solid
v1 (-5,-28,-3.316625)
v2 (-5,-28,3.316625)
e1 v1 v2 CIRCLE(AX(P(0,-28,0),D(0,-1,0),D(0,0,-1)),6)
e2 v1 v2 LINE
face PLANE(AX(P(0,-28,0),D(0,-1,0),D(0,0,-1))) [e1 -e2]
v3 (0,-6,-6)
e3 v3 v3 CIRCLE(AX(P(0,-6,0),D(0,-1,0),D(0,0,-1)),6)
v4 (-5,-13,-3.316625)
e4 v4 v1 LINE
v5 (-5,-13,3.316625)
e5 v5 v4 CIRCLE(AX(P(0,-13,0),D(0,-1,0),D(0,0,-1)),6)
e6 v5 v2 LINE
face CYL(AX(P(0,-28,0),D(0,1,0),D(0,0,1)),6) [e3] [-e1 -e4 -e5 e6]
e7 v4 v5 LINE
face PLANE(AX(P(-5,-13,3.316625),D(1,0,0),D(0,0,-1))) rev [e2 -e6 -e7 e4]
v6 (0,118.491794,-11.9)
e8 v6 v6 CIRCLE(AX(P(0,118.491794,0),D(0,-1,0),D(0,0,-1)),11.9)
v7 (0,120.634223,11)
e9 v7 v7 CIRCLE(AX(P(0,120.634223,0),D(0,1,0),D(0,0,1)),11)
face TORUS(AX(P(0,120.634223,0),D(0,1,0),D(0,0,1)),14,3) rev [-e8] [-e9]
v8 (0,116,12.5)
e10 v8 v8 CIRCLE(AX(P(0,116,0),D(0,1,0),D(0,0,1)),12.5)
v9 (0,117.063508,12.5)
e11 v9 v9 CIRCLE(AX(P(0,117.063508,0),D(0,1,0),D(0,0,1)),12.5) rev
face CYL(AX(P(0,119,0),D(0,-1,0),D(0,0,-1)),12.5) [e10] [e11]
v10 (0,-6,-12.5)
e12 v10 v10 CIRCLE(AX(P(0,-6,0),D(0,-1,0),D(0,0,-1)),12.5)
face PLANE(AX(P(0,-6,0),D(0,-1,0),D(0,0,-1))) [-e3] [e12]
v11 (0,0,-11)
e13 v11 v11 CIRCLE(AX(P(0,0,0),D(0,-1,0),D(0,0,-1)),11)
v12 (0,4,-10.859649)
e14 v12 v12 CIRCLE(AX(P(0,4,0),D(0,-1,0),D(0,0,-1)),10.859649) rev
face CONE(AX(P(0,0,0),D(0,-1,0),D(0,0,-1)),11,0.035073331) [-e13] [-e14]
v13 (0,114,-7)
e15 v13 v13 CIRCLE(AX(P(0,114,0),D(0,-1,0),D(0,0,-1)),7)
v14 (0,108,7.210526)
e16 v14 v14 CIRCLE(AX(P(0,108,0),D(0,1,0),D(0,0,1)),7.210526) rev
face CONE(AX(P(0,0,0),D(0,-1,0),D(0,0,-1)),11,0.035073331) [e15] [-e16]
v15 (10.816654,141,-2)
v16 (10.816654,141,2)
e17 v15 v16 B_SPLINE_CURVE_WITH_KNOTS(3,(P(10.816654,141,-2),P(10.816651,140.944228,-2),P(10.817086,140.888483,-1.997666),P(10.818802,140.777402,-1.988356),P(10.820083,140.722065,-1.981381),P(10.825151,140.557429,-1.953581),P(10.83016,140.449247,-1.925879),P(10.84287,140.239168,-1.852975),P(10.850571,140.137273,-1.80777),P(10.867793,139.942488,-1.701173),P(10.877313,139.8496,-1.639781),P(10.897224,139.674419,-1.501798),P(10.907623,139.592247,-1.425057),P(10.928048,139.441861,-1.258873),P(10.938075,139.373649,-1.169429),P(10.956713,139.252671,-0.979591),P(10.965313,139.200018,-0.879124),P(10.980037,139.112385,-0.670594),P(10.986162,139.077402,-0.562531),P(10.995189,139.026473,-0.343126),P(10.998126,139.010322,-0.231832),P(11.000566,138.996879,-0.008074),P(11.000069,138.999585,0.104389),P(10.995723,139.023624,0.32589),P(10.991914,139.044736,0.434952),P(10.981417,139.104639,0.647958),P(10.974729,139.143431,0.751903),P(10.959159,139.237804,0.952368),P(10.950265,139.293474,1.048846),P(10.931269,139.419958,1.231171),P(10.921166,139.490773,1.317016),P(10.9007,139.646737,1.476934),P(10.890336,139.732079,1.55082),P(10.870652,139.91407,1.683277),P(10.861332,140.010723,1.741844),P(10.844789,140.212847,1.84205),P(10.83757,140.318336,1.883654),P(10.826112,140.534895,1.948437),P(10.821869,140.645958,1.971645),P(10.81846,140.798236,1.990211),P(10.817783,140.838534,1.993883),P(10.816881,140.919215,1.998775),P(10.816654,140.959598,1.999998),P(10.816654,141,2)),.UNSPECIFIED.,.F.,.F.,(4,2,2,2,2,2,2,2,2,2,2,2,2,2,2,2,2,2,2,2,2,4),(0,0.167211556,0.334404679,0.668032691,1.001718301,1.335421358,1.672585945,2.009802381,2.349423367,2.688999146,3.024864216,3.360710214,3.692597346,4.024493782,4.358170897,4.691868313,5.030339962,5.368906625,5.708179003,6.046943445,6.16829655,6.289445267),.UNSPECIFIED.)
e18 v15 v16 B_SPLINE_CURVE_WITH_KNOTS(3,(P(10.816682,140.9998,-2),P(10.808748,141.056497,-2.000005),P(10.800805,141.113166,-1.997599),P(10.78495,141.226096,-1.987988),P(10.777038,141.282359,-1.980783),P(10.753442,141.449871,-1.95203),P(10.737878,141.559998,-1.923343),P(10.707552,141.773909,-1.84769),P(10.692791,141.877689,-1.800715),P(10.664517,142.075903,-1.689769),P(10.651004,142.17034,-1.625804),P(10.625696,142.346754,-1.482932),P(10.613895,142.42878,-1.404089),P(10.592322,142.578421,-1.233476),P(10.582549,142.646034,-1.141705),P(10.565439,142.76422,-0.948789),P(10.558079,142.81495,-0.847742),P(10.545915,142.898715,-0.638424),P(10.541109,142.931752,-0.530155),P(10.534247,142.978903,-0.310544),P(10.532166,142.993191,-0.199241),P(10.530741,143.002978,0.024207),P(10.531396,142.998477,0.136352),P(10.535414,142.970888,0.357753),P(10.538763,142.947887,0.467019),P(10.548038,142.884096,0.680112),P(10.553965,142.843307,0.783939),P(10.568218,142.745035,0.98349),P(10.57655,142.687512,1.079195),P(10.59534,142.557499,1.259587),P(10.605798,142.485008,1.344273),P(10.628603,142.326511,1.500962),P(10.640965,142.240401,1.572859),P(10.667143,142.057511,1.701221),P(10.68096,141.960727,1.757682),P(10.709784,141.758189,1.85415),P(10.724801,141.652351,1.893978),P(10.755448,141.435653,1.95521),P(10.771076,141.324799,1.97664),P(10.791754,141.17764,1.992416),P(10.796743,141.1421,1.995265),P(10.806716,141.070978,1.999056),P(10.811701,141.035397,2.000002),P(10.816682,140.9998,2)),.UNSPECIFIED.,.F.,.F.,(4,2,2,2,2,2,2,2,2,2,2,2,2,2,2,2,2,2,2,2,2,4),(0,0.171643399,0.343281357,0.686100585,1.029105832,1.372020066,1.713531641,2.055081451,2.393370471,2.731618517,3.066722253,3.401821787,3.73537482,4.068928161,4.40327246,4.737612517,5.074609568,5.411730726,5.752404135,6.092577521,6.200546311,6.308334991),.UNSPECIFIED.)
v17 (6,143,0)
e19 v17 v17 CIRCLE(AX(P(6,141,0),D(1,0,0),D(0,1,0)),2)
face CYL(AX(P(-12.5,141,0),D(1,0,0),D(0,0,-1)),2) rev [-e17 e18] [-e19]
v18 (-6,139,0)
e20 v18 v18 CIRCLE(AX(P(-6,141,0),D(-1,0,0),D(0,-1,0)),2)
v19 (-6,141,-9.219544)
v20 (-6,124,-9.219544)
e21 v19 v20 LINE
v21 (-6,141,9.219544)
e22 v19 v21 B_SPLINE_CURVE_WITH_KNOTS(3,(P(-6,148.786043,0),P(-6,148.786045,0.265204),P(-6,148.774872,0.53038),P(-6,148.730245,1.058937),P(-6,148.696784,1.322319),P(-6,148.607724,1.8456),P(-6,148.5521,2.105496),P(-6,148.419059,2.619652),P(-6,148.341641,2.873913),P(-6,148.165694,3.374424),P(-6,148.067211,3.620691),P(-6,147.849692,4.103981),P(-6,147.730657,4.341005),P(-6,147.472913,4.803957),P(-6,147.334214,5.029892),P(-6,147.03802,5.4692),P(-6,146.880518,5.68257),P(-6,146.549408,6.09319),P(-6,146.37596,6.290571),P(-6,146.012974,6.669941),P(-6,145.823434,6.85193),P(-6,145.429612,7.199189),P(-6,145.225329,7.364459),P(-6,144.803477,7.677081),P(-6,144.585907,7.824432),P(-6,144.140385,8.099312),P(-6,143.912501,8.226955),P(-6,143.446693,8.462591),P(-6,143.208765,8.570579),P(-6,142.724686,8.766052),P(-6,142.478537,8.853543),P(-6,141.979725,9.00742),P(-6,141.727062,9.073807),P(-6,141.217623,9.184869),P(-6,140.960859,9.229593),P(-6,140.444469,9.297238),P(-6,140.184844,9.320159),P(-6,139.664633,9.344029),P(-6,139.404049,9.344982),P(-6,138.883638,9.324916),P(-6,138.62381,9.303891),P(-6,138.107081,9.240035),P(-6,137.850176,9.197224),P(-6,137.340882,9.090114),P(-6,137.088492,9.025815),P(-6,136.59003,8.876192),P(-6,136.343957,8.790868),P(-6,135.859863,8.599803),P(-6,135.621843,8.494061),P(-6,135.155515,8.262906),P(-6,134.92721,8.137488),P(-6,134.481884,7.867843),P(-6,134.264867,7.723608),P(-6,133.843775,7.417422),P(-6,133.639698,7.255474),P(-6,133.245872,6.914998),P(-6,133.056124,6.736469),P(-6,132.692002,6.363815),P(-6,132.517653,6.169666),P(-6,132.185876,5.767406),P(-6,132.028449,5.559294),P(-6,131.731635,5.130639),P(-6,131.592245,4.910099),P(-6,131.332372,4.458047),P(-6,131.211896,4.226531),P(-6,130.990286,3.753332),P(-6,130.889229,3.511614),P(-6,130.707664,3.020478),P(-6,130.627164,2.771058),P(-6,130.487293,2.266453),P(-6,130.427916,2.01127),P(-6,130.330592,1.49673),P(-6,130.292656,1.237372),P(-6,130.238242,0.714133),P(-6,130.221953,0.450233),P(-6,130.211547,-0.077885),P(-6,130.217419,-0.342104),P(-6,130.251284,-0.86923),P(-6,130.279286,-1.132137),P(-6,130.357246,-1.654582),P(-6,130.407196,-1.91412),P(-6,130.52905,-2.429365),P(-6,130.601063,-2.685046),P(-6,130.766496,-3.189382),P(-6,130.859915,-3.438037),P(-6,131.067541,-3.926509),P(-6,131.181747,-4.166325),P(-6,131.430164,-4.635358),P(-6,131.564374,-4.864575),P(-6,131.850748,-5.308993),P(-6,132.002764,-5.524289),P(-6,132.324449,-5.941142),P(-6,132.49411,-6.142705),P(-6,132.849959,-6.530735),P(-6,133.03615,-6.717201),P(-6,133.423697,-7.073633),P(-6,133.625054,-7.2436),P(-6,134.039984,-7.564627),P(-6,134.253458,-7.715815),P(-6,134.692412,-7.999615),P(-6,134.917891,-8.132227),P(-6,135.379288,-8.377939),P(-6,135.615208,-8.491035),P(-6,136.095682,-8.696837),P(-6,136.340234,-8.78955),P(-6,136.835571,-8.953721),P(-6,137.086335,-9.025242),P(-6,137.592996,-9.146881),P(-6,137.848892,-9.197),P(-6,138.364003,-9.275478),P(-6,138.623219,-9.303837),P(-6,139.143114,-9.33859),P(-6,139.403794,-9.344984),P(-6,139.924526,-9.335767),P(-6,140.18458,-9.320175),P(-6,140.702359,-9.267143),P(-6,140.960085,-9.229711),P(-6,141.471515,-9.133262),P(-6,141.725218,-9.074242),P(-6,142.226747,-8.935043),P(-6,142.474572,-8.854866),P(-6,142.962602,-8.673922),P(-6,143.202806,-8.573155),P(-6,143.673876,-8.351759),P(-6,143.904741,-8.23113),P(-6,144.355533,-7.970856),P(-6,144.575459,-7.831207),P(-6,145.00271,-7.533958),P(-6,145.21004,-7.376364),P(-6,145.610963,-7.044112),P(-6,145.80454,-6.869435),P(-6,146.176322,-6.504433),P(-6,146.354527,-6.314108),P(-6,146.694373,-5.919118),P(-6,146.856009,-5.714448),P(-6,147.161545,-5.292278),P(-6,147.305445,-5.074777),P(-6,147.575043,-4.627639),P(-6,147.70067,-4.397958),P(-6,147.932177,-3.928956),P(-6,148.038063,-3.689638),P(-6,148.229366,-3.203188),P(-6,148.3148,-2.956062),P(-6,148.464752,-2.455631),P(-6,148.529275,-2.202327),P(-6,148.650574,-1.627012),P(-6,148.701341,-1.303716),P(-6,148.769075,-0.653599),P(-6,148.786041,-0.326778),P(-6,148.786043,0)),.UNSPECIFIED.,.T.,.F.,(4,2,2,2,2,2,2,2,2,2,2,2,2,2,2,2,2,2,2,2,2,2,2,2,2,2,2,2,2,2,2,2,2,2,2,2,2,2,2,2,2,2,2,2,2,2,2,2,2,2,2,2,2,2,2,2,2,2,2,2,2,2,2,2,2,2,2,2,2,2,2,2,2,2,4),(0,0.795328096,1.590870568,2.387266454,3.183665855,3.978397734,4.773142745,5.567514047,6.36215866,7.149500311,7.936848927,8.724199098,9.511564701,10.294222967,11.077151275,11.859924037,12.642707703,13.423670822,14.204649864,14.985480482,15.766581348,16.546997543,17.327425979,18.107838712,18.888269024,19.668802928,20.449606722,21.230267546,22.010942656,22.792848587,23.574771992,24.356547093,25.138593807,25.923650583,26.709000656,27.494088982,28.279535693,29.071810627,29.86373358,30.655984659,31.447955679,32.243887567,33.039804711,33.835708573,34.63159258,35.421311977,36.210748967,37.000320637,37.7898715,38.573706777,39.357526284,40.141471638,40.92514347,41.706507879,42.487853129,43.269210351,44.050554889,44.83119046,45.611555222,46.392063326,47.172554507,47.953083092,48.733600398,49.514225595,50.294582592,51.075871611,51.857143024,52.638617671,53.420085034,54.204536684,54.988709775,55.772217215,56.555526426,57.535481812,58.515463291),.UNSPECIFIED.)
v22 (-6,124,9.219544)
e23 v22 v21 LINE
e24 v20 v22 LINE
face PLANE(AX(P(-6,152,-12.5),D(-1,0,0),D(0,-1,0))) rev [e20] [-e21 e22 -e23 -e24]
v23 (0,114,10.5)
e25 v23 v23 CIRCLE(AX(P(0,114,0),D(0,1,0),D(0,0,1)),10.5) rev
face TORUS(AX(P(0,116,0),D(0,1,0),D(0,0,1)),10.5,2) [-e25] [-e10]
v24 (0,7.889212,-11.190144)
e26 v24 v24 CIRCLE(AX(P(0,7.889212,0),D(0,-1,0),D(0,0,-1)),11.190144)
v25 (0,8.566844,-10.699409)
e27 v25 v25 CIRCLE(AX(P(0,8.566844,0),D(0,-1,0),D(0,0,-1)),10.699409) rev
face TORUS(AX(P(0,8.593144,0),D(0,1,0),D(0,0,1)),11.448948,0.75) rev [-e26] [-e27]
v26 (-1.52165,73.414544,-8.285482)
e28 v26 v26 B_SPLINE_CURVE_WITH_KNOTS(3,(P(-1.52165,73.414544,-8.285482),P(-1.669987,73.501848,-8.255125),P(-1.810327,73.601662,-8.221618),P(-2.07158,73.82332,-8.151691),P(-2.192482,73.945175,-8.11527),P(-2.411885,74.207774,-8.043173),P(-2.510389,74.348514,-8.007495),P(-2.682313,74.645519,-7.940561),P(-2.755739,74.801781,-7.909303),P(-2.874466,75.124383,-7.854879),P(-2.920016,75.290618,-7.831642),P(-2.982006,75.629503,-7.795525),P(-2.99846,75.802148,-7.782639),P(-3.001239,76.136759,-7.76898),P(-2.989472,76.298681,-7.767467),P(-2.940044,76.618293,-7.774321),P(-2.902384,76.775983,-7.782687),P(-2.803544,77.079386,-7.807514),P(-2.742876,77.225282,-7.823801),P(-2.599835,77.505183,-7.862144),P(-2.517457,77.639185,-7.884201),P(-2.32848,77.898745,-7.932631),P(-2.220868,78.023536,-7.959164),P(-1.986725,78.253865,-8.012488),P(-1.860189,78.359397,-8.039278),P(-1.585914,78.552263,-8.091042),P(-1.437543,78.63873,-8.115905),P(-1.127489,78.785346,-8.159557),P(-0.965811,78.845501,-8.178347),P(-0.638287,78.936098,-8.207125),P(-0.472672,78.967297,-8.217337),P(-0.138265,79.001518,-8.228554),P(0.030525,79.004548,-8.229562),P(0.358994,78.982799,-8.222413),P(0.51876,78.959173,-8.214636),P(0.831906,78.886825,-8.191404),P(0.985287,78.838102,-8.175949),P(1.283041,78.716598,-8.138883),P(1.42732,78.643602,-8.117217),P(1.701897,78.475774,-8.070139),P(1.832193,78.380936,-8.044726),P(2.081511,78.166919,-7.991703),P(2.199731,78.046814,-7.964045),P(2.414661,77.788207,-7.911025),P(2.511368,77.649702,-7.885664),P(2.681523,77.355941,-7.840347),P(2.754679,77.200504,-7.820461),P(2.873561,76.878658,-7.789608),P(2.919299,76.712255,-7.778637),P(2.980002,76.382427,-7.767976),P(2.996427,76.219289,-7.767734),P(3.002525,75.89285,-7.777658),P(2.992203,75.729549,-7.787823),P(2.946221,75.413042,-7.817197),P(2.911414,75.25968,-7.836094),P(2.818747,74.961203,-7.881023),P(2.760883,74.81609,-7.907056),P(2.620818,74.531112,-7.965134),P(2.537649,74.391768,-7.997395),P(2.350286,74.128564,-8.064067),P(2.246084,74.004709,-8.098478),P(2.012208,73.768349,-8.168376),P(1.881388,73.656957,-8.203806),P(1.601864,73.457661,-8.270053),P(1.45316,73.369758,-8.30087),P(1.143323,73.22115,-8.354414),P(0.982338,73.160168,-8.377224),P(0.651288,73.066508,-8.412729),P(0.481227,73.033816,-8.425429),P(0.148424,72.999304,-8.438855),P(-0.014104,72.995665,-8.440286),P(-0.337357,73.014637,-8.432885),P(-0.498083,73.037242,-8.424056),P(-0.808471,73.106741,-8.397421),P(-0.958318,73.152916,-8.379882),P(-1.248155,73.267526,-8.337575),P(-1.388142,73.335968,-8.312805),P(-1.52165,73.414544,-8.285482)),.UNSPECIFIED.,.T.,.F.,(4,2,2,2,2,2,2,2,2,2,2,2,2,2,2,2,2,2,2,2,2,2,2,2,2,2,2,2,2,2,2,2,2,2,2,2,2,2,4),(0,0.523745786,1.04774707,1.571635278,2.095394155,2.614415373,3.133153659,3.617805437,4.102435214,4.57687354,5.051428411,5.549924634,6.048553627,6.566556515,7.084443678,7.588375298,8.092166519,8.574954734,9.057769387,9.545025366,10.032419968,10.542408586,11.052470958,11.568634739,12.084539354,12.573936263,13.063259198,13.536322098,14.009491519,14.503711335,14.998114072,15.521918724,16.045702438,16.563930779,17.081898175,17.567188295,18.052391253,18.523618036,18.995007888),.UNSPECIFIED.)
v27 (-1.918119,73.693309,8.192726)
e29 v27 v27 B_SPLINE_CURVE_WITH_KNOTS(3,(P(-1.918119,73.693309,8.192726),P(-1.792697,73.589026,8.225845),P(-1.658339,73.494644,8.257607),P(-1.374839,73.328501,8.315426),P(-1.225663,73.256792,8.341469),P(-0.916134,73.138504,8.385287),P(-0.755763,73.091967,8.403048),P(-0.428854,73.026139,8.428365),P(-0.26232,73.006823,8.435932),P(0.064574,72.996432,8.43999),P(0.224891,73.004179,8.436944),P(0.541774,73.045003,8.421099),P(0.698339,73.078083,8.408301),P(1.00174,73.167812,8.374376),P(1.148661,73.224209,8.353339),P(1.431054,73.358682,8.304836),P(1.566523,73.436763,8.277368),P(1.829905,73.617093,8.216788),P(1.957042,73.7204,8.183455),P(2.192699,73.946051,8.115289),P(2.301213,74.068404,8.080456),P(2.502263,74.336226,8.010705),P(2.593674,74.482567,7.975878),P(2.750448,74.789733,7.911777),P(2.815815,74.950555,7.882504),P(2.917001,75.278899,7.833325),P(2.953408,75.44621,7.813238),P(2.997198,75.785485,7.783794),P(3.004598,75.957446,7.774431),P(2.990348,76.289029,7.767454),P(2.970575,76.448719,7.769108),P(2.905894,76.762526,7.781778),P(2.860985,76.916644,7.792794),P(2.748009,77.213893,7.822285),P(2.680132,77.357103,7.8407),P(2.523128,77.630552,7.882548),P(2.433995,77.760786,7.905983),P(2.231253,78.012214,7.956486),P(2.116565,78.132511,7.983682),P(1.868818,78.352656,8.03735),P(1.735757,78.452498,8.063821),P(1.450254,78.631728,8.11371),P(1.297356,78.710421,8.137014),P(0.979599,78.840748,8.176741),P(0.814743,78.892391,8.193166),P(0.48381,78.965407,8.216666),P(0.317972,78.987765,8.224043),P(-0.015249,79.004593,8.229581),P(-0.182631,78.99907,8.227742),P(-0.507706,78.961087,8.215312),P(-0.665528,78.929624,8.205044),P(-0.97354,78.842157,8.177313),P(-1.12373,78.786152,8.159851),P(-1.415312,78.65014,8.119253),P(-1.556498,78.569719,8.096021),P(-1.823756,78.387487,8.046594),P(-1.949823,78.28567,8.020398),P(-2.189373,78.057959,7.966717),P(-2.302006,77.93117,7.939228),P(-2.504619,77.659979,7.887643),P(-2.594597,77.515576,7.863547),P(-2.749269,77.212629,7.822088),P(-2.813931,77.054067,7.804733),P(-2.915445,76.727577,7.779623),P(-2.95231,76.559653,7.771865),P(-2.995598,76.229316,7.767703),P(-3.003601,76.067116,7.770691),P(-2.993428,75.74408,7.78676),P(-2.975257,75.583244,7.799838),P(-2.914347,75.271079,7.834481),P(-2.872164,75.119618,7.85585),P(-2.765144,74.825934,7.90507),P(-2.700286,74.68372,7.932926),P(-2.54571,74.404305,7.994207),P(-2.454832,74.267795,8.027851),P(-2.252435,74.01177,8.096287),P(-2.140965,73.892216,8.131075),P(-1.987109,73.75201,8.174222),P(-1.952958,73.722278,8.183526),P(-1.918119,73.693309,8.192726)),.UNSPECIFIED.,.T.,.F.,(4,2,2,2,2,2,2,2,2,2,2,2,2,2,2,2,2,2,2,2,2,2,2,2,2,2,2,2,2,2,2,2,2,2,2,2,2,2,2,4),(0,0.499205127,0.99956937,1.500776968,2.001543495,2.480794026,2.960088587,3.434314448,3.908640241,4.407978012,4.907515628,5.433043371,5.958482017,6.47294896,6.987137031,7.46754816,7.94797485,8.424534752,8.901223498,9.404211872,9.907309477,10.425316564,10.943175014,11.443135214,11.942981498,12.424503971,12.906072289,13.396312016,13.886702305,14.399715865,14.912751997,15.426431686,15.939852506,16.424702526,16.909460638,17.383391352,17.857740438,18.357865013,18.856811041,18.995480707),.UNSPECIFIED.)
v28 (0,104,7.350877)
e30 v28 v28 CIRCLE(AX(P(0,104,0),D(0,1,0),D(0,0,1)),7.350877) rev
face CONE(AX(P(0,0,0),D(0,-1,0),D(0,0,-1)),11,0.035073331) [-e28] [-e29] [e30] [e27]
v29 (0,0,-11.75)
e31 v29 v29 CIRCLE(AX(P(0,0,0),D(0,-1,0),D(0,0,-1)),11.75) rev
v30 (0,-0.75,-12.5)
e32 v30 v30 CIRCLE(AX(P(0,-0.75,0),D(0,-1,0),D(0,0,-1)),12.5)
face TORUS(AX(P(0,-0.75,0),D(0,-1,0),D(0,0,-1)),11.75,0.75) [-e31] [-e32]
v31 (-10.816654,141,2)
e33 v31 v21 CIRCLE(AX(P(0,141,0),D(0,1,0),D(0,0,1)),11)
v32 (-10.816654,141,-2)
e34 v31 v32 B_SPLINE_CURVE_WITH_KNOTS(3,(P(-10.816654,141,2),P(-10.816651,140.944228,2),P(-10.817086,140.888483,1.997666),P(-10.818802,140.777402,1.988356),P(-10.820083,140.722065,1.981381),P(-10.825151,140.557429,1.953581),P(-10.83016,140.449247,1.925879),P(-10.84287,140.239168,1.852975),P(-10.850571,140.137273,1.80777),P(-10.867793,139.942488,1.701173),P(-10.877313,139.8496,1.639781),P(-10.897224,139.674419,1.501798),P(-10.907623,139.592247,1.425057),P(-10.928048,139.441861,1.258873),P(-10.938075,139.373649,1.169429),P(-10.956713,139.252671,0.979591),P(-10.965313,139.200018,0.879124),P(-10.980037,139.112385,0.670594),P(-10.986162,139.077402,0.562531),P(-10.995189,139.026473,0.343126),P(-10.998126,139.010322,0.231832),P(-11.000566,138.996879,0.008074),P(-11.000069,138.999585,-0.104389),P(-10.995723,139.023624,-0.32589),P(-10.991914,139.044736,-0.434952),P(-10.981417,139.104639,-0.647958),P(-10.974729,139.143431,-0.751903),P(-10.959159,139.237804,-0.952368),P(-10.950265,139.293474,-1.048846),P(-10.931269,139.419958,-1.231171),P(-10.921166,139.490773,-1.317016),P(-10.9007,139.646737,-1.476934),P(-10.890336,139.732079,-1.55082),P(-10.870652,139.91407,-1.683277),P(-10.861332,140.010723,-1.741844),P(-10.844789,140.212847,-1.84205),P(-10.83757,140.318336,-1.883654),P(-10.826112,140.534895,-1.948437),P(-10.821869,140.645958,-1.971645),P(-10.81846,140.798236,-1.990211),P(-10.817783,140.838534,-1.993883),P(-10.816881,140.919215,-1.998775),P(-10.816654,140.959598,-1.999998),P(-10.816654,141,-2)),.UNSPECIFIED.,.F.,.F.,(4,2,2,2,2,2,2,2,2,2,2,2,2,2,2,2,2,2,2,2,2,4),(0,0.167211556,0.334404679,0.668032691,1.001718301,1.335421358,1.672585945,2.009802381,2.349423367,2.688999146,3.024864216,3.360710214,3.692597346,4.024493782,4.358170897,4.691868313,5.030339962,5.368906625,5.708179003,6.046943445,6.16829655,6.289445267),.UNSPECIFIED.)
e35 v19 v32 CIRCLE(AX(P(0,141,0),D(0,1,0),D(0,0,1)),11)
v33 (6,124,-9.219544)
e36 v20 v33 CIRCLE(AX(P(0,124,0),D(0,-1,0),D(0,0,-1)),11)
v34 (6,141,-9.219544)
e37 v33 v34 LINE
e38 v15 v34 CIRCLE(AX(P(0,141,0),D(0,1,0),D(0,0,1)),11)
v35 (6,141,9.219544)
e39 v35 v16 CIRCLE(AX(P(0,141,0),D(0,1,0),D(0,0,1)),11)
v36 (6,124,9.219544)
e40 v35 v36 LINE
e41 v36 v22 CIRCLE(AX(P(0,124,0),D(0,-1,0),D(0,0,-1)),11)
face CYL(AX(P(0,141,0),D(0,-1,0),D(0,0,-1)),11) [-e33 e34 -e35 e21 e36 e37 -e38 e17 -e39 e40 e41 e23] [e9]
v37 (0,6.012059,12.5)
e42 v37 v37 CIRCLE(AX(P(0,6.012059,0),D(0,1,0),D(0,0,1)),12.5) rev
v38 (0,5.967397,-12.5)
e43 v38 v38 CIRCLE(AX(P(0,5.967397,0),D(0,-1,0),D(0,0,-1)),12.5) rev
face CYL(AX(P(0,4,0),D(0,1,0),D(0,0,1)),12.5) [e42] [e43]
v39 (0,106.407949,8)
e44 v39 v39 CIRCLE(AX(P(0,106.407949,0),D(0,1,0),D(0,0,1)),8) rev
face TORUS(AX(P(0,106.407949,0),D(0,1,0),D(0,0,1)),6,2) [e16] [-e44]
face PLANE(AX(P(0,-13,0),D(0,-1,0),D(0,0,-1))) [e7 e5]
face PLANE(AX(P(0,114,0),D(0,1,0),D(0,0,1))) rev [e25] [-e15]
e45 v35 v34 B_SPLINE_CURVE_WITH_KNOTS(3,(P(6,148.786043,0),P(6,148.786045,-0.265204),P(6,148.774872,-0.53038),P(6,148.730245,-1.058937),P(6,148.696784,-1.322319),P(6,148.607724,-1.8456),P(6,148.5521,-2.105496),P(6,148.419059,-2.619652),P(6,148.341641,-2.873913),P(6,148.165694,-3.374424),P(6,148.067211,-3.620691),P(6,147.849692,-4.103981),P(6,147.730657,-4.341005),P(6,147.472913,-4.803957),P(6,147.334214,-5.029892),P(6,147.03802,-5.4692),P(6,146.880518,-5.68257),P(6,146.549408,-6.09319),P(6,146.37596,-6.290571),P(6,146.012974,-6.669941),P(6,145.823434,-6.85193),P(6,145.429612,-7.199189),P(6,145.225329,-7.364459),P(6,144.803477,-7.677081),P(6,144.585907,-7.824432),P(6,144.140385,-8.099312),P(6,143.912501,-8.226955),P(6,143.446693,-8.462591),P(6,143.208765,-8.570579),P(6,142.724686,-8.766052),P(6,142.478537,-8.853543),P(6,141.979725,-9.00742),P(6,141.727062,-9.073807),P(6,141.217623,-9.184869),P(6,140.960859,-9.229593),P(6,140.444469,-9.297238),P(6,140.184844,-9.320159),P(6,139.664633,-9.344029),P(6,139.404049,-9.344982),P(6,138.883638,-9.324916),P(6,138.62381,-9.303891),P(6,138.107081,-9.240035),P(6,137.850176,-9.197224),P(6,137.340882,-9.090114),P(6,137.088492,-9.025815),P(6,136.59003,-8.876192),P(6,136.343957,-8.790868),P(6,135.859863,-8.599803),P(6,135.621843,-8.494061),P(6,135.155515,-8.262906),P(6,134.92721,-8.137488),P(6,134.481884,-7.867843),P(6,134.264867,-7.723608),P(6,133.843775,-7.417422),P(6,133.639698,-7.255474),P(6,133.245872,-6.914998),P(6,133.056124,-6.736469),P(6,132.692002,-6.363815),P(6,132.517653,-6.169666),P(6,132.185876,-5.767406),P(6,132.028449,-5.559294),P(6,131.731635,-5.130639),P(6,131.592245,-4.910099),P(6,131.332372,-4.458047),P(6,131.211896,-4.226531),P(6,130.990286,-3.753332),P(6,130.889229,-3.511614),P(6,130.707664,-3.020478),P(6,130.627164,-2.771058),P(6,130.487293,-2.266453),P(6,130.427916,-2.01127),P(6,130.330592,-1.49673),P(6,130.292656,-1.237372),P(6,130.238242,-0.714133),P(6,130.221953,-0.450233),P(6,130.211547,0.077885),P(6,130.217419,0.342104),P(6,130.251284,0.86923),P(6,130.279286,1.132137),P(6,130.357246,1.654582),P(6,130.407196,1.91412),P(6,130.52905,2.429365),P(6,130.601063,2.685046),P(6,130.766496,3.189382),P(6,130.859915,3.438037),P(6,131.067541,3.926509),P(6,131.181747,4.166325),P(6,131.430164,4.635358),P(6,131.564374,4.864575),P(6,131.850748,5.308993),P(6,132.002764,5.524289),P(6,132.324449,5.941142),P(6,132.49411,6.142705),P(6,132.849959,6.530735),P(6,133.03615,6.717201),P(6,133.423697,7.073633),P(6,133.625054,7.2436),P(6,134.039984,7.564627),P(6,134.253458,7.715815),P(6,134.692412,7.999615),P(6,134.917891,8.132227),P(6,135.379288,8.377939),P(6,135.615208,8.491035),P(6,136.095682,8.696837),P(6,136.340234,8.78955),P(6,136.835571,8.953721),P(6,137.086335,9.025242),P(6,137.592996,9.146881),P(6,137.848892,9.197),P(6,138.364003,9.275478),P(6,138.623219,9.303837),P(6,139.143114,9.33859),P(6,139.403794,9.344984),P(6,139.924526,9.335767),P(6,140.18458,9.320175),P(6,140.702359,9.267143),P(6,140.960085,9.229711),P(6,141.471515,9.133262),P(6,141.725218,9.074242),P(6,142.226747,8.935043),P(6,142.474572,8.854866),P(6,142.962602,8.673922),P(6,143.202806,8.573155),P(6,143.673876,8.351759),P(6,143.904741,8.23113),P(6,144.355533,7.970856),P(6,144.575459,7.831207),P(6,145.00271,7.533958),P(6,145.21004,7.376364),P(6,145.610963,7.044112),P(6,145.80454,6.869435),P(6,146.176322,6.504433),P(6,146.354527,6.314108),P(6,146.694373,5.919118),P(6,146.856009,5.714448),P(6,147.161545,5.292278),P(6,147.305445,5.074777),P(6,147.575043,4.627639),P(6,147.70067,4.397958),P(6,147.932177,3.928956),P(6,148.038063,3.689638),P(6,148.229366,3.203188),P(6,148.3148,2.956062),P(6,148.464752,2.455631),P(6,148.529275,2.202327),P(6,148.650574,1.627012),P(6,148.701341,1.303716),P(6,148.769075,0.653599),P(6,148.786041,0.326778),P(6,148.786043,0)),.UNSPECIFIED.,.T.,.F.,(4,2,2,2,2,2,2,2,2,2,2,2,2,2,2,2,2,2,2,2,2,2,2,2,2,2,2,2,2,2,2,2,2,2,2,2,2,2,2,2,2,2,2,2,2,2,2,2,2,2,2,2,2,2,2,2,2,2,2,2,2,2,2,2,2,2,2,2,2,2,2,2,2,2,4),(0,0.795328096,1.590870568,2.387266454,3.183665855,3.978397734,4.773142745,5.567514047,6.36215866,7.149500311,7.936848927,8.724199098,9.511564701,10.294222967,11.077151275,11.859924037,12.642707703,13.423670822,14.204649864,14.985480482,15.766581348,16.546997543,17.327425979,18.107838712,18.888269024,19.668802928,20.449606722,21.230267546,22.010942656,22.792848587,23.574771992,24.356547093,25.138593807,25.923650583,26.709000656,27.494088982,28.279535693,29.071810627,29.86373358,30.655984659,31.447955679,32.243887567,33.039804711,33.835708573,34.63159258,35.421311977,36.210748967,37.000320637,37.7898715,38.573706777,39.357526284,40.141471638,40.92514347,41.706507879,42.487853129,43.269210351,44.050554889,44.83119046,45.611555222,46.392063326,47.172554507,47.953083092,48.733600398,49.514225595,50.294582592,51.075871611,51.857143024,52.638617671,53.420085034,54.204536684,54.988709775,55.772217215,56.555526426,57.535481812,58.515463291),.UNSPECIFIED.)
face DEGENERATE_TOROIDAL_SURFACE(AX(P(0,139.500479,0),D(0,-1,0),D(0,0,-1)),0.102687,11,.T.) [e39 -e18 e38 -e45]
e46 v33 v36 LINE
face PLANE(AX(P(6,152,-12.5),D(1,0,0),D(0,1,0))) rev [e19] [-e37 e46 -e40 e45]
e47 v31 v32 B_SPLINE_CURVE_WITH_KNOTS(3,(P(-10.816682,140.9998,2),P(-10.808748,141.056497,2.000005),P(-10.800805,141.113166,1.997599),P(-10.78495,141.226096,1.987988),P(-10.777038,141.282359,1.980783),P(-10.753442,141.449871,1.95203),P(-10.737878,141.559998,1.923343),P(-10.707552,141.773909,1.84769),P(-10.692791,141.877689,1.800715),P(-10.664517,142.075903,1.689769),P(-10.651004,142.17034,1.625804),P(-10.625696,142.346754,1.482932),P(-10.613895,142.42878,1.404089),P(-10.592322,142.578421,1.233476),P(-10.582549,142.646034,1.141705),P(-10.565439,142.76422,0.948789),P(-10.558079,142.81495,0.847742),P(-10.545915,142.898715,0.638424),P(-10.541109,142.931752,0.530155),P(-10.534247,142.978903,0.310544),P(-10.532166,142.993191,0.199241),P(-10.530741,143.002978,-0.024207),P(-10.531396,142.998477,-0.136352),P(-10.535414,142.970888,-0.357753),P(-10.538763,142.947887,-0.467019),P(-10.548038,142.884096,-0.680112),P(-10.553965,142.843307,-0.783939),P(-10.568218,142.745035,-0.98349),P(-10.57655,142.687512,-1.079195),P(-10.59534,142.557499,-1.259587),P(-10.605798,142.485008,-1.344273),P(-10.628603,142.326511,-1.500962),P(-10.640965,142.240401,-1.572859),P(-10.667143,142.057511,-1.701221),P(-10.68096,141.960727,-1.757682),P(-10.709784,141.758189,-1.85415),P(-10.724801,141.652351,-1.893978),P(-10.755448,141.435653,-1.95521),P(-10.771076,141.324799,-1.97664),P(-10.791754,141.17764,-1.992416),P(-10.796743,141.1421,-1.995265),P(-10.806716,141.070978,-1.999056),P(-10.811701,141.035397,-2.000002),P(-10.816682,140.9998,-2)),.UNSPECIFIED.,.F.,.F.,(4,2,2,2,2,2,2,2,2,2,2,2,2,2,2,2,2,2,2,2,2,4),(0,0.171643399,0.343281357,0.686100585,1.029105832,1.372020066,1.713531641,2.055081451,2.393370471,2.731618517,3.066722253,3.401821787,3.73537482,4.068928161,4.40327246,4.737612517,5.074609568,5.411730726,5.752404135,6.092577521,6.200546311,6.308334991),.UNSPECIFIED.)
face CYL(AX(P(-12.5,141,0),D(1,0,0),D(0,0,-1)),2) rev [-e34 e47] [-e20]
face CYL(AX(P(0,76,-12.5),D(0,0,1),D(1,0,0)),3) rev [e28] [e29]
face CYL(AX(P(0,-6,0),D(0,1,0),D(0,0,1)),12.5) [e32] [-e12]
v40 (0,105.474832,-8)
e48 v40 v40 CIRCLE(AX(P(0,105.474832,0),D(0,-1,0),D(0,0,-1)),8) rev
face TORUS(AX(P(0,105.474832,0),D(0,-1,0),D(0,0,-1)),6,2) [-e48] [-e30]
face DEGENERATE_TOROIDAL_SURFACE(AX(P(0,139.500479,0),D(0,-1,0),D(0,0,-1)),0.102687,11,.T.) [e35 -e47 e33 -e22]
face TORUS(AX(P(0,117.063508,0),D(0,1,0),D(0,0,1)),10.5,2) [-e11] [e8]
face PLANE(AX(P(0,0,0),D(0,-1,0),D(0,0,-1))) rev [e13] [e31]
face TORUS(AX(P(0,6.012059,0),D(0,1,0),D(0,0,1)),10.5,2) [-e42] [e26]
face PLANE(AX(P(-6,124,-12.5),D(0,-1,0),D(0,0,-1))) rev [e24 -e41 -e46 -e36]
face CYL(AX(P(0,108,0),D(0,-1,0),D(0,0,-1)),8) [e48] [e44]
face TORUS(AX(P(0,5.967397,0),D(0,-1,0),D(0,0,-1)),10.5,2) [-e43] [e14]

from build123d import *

# Parameters (mm, degrees)
SKETCH2_R               = 12.5
BOSS_EXTRUDE1_DEPTH     = 6
BOSS_EXTRUDE2_START     = -12
SKETCH3_R               = 12.5
BOSS_EXTRUDE2_DEPTH     = 2
FILLET1_R               = 2
FILLET2_R               = 0.75
SKETCH4_R               = 6
BOSS_EXTRUDE3_DEPTH     = 22
CUT_EXTRUDE1_START      = -15
CUT_EXTRUDE1_DEPTH      = 15
BOSS_EXTRUDE4_START     = -8
SKETCH6_R               = 8
BOSS_EXTRUDE4_DEPTH     = 2
FILLET3_R               = 2
SKETCH7_R               = 12.5
BOSS_EXTRUDE5_DEPTH     = 5
SKETCH8_R               = 11
BOSS_EXTRUDE6_DEPTH     = 22
FILLET4_R               = 2
FILLET5_R               = 3
FILLET6_R               = 0.75
CUT_EXTRUDE2_DEPTH      = 152.535125655
CUT_EXTRUDE2_DEPTH_BACK = 152.535125655
SKETCH10_W              = 12
SKETCH10_H              = 28
CUT_EXTRUDE3_DEPTH      = 150.832528731
CUT_EXTRUDE3_DEPTH_BACK = 150.832528731
SKETCH11_R              = 3
CUT_EXTRUDE4_DEPTH      = 150.832528731
CUT_EXTRUDE4_DEPTH_BACK = 150.832528731
SKETCH12_R              = 2


with BuildPart() as part:
    # Sketch1 → Revolve1 (revolve)
    with BuildSketch(Plane.XY, mode=Mode.PRIVATE) as revolve1_sk:
        Polygon((0, 0), (0, 114), (7, 114), (11, 0), align=None)
    revolve(revolve1_sk.sketch.rotate(Axis((0, 0, 0), (0, 1, 0)), 90), axis=Axis((0, 0, 0), (0, 1, 0)))

    # Sketch2 → Boss-Extrude1 (add)
    with BuildSketch(Plane.XZ):
        with Locations(Location((0, 0, 0), (0, 0, 270))):
            Circle(SKETCH2_R)
    extrude(amount=BOSS_EXTRUDE1_DEPTH)

    # Sketch3 → Boss-Extrude2 (add, symmetric)
    with BuildSketch(Plane.XZ.offset(6).offset(BOSS_EXTRUDE2_START)):
        with Locations(Location((0, 0, 0), (0, 0, 270))):
            Circle(SKETCH3_R)
    extrude(amount=BOSS_EXTRUDE2_DEPTH, both=True)

    # Fillet1
    # the kernel refuses this fillet: 2 mm, written as the material it takes off along each edge
    with BuildSketch(Plane(origin=(0, 8, 0), x_dir=(0, 0, -1), z_dir=(-1, 0, 0))) as fillet1_piece_1:
        with BuildLine():
            CenterArc((10.5, 1.987940713), FILLET1_R, 276.295089439, 83.704910561)
            Line((10.719298246, 0), (10.723684211, -0.039758814))
            ThreePointArc((10.723684211, -0.039758814), (11.609649123, -0.04), (12.5, -0.04))
            Line((12.5, -0.04), (12.54, 0))
            Line((12.54, 0), (12.54, 1.987940713))
            Line((12.54, 1.987940713), (12.5, 1.987940713))
        make_face()
    revolve(axis=Axis((0, 8, 0), (0, -1, 0)), mode=Mode.SUBTRACT)
    with BuildSketch(Plane(origin=(0, 4, 0), x_dir=(0, 0, -1), z_dir=(-1, 0, 0))) as fillet1_piece_2:
        with BuildLine():
            CenterArc((10.5, -1.967397395), FILLET1_R, 0, 79.640458827)
            Line((12.5, -1.967397395), (12.54, -1.967397395))
            Line((12.54, -1.967397395), (12.54, 0))
            Line((12.54, 0), (12.5, 0.04))
            ThreePointArc((12.5, 0.04), (11.679824561, 0.04), (10.866842105, 0.039347948))
            Line((10.866842105, 0.039347948), (10.859649123, 0))
        make_face()
    revolve(axis=Axis((0, 4, 0), (0, -1, 0)), mode=Mode.SUBTRACT)

    # Fillet2
    fillet2_edges = [part.edges().sort_by_distance(p)[0] for p in [
        (0, 0, 12.5),
    ]]
    fillet(fillet2_edges, radius=FILLET2_R)

    # Sketch4 → Boss-Extrude3 (add)
    with BuildSketch(Plane.XZ.offset(6)):
        with Locations(Location((0, 0, 0), (0, 0, 270))):
            Circle(SKETCH4_R)
    extrude(amount=BOSS_EXTRUDE3_DEPTH)

    # Sketch5 → Cut-Extrude1 (cut)
    with BuildSketch(Plane.XZ.offset(28).offset(CUT_EXTRUDE1_START)):
        with BuildLine():
            Line((-5, 3.31662479), (-5, -3.31662479))
            ThreePointArc((-5, -3.31662479), (-6, 0), (-5, 3.31662479))
        make_face()
    extrude(amount=CUT_EXTRUDE1_DEPTH, mode=Mode.SUBTRACT)

    # Sketch6 → Boss-Extrude4 (add, symmetric)
    with BuildSketch(Plane(origin=(0, 114, 0), x_dir=(1, 0, 0), z_dir=(0, 1, 0)).offset(BOSS_EXTRUDE4_START)):
        with Locations(Location((0, 0, 0), (0, 0, 270))):
            Circle(SKETCH6_R)
    extrude(amount=BOSS_EXTRUDE4_DEPTH, both=True)

    # Fillet3
    # the kernel refuses this fillet: 2 mm, written as the material it takes off along each edge
    with BuildSketch(Plane(origin=(0, 104, 0), x_dir=(0, 0, 1), z_dir=(-1, 0, 0))) as fillet3_piece_1:
        with BuildLine():
            CenterArc((6, 1.474832468), FILLET3_R, 312.488219007, 47.511780993)
            Line((8, 1.474832468), (8.04, 1.474832468))
            Line((8.04, 1.474832468), (8.04, 0))
            Line((8.04, 0), (8, -0.04))
            ThreePointArc((8, -0.04), (7.675438596, -0.04), (7.377894737, -0.029496649))
            Line((7.377894737, -0.029496649), (7.350877193, 0))
        make_face()
    revolve(axis=Axis((0, 104, 0), (0, 1, 0)), mode=Mode.SUBTRACT)
    with BuildSketch(Plane(origin=(0, 108, 0), x_dir=(0, 0, 1), z_dir=(-1, 0, 0))) as fillet3_piece_2:
        with BuildLine():
            CenterArc((6, -1.592050891), FILLET3_R, 0, 52.752219104)
            Line((7.210526316, 0), (7.234736842, 0.031841018))
            ThreePointArc((7.234736842, 0.031841018), (7.605263158, 0.04), (8, 0.04))
            Line((8, 0.04), (8.04, 0))
            Line((8.04, 0), (8.04, -1.592050891))
            Line((8.04, -1.592050891), (8, -1.592050891))
        make_face()
    revolve(axis=Axis((0, 108, 0), (0, 1, 0)), mode=Mode.SUBTRACT)

    # Sketch7 → Boss-Extrude5 (add)
    with BuildSketch(Plane(origin=(0, 114, 0), x_dir=(1, 0, 0), z_dir=(0, 1, 0))):
        with Locations(Location((0, 0, 0), (0, 0, 90))):
            Circle(SKETCH7_R)
    extrude(amount=BOSS_EXTRUDE5_DEPTH)

    # Sketch8 → Boss-Extrude6 (add)
    with BuildSketch(Plane(origin=(0, 119, 0), x_dir=(1, 0, 0), z_dir=(0, 1, 0))):
        with Locations(Location((0, 0, 0), (0, 0, 270))):
            Circle(SKETCH8_R)
    extrude(amount=BOSS_EXTRUDE6_DEPTH)

    # Fillet4
    # the kernel refuses this fillet: 2 mm, written as the material it takes off along each edge
    with BuildSketch(Plane(origin=(0, 114, 0), x_dir=(0, 0, -1), z_dir=(1, 0, 0))) as fillet4_piece_1:
        with BuildLine():
            CenterArc((12.5 - FILLET4_R, FILLET4_R), FILLET4_R, 270, 90)
            Line((12.5 - FILLET4_R, 0), (12.5 - FILLET4_R, -FILLET4_R * 0.02))
            Line((12.5 - FILLET4_R, -FILLET4_R * 0.02), (12.5 + FILLET4_R * 0.02, -FILLET4_R * 0.02))
            Line((12.5 + FILLET4_R * 0.02, -FILLET4_R * 0.02), (12.5 + FILLET4_R * 0.02, FILLET4_R))
            Line((12.5 + FILLET4_R * 0.02, FILLET4_R), (12.5, FILLET4_R))
        make_face()
    revolve(axis=Axis((0, 114, 0), (0, 1, 0)), mode=Mode.SUBTRACT)
    with BuildSketch(Plane(origin=(0, 119, 0), x_dir=(0, 0, -1), z_dir=(1, 0, 0))) as fillet4_piece_2:
        with BuildLine():
            CenterArc((10.5, -1.936491673), FILLET4_R, 0, 75.522487814)
            Line((11, 0), (11.01, 0.038729833))
            ThreePointArc((11.01, 0.038729833), (11.75, 0.04), (12.5, 0.04))
            Line((12.5, 0.04), (12.54, 0))
            Line((12.54, 0), (12.54, -1.936491673))
            Line((12.54, -1.936491673), (12.5, -1.936491673))
        make_face()
    revolve(axis=Axis((0, 119, 0), (0, 1, 0)), mode=Mode.SUBTRACT)

    # Fillet5
    fillet5_edges = [part.edges().sort_by_distance(p)[0] for p in [
        (-11, 119, 0),
    ]]
    fillet(fillet5_edges, radius=FILLET5_R)

    # Fillet6
    fillet6_edges = [part.edges().sort_by_distance(p)[0] for p in [
        (0, 8, 10.719298246),
    ]]
    fillet(fillet6_edges, radius=FILLET6_R)

    # Sketch9 → Revolve2 (revolve)
    with BuildSketch(Plane.XY, mode=Mode.PRIVATE) as revolve2_sk:
        with BuildLine():
            Line((11, 141), (0, 141))
            Line((0, 141), (0, 150.5))
            ThreePointArc((0, 150.5), (7.292505249, 147.825532394), (11, 141))
        make_face()
    revolve(revolve2_sk.sketch.rotate(Axis((0, 141, 0), (0, 1, 0)), 270), axis=Axis((0, 141, 0), (0, 1, 0)))

    # Sketch10 → Cut-Extrude2 (cut, two sides: drawn at the far end of the back side and taken through both)
    with BuildSketch(Plane.XY.offset(-CUT_EXTRUDE2_DEPTH_BACK)):
        with Locations((0, 138)):
            Rectangle(SKETCH10_W, SKETCH10_H)
    extrude(amount=CUT_EXTRUDE2_DEPTH + CUT_EXTRUDE2_DEPTH_BACK, mode=Mode.SUBTRACT)

    # Sketch11 → Cut-Extrude3 (cut, two sides: drawn at the far end of the back side and taken through both)
    with BuildSketch(Plane.XY.offset(-CUT_EXTRUDE3_DEPTH_BACK)):
        with Locations(Location((0, 76, 0), (0, 0, 90))):
            Circle(SKETCH11_R)
    extrude(amount=CUT_EXTRUDE3_DEPTH + CUT_EXTRUDE3_DEPTH_BACK, mode=Mode.SUBTRACT)

    # Sketch12 → Cut-Extrude4 (cut, two sides: drawn at the far end of the back side and taken through both)
    with BuildSketch(Plane(origin=(0, 0, 0), x_dir=(0, 0, -1), z_dir=(1, 0, 0)).offset(-CUT_EXTRUDE4_DEPTH_BACK)):
        with Locations((0, 141)):
            Circle(SKETCH12_R)
    extrude(amount=CUT_EXTRUDE4_DEPTH + CUT_EXTRUDE4_DEPTH_BACK, mode=Mode.SUBTRACT)


solid = part.part
